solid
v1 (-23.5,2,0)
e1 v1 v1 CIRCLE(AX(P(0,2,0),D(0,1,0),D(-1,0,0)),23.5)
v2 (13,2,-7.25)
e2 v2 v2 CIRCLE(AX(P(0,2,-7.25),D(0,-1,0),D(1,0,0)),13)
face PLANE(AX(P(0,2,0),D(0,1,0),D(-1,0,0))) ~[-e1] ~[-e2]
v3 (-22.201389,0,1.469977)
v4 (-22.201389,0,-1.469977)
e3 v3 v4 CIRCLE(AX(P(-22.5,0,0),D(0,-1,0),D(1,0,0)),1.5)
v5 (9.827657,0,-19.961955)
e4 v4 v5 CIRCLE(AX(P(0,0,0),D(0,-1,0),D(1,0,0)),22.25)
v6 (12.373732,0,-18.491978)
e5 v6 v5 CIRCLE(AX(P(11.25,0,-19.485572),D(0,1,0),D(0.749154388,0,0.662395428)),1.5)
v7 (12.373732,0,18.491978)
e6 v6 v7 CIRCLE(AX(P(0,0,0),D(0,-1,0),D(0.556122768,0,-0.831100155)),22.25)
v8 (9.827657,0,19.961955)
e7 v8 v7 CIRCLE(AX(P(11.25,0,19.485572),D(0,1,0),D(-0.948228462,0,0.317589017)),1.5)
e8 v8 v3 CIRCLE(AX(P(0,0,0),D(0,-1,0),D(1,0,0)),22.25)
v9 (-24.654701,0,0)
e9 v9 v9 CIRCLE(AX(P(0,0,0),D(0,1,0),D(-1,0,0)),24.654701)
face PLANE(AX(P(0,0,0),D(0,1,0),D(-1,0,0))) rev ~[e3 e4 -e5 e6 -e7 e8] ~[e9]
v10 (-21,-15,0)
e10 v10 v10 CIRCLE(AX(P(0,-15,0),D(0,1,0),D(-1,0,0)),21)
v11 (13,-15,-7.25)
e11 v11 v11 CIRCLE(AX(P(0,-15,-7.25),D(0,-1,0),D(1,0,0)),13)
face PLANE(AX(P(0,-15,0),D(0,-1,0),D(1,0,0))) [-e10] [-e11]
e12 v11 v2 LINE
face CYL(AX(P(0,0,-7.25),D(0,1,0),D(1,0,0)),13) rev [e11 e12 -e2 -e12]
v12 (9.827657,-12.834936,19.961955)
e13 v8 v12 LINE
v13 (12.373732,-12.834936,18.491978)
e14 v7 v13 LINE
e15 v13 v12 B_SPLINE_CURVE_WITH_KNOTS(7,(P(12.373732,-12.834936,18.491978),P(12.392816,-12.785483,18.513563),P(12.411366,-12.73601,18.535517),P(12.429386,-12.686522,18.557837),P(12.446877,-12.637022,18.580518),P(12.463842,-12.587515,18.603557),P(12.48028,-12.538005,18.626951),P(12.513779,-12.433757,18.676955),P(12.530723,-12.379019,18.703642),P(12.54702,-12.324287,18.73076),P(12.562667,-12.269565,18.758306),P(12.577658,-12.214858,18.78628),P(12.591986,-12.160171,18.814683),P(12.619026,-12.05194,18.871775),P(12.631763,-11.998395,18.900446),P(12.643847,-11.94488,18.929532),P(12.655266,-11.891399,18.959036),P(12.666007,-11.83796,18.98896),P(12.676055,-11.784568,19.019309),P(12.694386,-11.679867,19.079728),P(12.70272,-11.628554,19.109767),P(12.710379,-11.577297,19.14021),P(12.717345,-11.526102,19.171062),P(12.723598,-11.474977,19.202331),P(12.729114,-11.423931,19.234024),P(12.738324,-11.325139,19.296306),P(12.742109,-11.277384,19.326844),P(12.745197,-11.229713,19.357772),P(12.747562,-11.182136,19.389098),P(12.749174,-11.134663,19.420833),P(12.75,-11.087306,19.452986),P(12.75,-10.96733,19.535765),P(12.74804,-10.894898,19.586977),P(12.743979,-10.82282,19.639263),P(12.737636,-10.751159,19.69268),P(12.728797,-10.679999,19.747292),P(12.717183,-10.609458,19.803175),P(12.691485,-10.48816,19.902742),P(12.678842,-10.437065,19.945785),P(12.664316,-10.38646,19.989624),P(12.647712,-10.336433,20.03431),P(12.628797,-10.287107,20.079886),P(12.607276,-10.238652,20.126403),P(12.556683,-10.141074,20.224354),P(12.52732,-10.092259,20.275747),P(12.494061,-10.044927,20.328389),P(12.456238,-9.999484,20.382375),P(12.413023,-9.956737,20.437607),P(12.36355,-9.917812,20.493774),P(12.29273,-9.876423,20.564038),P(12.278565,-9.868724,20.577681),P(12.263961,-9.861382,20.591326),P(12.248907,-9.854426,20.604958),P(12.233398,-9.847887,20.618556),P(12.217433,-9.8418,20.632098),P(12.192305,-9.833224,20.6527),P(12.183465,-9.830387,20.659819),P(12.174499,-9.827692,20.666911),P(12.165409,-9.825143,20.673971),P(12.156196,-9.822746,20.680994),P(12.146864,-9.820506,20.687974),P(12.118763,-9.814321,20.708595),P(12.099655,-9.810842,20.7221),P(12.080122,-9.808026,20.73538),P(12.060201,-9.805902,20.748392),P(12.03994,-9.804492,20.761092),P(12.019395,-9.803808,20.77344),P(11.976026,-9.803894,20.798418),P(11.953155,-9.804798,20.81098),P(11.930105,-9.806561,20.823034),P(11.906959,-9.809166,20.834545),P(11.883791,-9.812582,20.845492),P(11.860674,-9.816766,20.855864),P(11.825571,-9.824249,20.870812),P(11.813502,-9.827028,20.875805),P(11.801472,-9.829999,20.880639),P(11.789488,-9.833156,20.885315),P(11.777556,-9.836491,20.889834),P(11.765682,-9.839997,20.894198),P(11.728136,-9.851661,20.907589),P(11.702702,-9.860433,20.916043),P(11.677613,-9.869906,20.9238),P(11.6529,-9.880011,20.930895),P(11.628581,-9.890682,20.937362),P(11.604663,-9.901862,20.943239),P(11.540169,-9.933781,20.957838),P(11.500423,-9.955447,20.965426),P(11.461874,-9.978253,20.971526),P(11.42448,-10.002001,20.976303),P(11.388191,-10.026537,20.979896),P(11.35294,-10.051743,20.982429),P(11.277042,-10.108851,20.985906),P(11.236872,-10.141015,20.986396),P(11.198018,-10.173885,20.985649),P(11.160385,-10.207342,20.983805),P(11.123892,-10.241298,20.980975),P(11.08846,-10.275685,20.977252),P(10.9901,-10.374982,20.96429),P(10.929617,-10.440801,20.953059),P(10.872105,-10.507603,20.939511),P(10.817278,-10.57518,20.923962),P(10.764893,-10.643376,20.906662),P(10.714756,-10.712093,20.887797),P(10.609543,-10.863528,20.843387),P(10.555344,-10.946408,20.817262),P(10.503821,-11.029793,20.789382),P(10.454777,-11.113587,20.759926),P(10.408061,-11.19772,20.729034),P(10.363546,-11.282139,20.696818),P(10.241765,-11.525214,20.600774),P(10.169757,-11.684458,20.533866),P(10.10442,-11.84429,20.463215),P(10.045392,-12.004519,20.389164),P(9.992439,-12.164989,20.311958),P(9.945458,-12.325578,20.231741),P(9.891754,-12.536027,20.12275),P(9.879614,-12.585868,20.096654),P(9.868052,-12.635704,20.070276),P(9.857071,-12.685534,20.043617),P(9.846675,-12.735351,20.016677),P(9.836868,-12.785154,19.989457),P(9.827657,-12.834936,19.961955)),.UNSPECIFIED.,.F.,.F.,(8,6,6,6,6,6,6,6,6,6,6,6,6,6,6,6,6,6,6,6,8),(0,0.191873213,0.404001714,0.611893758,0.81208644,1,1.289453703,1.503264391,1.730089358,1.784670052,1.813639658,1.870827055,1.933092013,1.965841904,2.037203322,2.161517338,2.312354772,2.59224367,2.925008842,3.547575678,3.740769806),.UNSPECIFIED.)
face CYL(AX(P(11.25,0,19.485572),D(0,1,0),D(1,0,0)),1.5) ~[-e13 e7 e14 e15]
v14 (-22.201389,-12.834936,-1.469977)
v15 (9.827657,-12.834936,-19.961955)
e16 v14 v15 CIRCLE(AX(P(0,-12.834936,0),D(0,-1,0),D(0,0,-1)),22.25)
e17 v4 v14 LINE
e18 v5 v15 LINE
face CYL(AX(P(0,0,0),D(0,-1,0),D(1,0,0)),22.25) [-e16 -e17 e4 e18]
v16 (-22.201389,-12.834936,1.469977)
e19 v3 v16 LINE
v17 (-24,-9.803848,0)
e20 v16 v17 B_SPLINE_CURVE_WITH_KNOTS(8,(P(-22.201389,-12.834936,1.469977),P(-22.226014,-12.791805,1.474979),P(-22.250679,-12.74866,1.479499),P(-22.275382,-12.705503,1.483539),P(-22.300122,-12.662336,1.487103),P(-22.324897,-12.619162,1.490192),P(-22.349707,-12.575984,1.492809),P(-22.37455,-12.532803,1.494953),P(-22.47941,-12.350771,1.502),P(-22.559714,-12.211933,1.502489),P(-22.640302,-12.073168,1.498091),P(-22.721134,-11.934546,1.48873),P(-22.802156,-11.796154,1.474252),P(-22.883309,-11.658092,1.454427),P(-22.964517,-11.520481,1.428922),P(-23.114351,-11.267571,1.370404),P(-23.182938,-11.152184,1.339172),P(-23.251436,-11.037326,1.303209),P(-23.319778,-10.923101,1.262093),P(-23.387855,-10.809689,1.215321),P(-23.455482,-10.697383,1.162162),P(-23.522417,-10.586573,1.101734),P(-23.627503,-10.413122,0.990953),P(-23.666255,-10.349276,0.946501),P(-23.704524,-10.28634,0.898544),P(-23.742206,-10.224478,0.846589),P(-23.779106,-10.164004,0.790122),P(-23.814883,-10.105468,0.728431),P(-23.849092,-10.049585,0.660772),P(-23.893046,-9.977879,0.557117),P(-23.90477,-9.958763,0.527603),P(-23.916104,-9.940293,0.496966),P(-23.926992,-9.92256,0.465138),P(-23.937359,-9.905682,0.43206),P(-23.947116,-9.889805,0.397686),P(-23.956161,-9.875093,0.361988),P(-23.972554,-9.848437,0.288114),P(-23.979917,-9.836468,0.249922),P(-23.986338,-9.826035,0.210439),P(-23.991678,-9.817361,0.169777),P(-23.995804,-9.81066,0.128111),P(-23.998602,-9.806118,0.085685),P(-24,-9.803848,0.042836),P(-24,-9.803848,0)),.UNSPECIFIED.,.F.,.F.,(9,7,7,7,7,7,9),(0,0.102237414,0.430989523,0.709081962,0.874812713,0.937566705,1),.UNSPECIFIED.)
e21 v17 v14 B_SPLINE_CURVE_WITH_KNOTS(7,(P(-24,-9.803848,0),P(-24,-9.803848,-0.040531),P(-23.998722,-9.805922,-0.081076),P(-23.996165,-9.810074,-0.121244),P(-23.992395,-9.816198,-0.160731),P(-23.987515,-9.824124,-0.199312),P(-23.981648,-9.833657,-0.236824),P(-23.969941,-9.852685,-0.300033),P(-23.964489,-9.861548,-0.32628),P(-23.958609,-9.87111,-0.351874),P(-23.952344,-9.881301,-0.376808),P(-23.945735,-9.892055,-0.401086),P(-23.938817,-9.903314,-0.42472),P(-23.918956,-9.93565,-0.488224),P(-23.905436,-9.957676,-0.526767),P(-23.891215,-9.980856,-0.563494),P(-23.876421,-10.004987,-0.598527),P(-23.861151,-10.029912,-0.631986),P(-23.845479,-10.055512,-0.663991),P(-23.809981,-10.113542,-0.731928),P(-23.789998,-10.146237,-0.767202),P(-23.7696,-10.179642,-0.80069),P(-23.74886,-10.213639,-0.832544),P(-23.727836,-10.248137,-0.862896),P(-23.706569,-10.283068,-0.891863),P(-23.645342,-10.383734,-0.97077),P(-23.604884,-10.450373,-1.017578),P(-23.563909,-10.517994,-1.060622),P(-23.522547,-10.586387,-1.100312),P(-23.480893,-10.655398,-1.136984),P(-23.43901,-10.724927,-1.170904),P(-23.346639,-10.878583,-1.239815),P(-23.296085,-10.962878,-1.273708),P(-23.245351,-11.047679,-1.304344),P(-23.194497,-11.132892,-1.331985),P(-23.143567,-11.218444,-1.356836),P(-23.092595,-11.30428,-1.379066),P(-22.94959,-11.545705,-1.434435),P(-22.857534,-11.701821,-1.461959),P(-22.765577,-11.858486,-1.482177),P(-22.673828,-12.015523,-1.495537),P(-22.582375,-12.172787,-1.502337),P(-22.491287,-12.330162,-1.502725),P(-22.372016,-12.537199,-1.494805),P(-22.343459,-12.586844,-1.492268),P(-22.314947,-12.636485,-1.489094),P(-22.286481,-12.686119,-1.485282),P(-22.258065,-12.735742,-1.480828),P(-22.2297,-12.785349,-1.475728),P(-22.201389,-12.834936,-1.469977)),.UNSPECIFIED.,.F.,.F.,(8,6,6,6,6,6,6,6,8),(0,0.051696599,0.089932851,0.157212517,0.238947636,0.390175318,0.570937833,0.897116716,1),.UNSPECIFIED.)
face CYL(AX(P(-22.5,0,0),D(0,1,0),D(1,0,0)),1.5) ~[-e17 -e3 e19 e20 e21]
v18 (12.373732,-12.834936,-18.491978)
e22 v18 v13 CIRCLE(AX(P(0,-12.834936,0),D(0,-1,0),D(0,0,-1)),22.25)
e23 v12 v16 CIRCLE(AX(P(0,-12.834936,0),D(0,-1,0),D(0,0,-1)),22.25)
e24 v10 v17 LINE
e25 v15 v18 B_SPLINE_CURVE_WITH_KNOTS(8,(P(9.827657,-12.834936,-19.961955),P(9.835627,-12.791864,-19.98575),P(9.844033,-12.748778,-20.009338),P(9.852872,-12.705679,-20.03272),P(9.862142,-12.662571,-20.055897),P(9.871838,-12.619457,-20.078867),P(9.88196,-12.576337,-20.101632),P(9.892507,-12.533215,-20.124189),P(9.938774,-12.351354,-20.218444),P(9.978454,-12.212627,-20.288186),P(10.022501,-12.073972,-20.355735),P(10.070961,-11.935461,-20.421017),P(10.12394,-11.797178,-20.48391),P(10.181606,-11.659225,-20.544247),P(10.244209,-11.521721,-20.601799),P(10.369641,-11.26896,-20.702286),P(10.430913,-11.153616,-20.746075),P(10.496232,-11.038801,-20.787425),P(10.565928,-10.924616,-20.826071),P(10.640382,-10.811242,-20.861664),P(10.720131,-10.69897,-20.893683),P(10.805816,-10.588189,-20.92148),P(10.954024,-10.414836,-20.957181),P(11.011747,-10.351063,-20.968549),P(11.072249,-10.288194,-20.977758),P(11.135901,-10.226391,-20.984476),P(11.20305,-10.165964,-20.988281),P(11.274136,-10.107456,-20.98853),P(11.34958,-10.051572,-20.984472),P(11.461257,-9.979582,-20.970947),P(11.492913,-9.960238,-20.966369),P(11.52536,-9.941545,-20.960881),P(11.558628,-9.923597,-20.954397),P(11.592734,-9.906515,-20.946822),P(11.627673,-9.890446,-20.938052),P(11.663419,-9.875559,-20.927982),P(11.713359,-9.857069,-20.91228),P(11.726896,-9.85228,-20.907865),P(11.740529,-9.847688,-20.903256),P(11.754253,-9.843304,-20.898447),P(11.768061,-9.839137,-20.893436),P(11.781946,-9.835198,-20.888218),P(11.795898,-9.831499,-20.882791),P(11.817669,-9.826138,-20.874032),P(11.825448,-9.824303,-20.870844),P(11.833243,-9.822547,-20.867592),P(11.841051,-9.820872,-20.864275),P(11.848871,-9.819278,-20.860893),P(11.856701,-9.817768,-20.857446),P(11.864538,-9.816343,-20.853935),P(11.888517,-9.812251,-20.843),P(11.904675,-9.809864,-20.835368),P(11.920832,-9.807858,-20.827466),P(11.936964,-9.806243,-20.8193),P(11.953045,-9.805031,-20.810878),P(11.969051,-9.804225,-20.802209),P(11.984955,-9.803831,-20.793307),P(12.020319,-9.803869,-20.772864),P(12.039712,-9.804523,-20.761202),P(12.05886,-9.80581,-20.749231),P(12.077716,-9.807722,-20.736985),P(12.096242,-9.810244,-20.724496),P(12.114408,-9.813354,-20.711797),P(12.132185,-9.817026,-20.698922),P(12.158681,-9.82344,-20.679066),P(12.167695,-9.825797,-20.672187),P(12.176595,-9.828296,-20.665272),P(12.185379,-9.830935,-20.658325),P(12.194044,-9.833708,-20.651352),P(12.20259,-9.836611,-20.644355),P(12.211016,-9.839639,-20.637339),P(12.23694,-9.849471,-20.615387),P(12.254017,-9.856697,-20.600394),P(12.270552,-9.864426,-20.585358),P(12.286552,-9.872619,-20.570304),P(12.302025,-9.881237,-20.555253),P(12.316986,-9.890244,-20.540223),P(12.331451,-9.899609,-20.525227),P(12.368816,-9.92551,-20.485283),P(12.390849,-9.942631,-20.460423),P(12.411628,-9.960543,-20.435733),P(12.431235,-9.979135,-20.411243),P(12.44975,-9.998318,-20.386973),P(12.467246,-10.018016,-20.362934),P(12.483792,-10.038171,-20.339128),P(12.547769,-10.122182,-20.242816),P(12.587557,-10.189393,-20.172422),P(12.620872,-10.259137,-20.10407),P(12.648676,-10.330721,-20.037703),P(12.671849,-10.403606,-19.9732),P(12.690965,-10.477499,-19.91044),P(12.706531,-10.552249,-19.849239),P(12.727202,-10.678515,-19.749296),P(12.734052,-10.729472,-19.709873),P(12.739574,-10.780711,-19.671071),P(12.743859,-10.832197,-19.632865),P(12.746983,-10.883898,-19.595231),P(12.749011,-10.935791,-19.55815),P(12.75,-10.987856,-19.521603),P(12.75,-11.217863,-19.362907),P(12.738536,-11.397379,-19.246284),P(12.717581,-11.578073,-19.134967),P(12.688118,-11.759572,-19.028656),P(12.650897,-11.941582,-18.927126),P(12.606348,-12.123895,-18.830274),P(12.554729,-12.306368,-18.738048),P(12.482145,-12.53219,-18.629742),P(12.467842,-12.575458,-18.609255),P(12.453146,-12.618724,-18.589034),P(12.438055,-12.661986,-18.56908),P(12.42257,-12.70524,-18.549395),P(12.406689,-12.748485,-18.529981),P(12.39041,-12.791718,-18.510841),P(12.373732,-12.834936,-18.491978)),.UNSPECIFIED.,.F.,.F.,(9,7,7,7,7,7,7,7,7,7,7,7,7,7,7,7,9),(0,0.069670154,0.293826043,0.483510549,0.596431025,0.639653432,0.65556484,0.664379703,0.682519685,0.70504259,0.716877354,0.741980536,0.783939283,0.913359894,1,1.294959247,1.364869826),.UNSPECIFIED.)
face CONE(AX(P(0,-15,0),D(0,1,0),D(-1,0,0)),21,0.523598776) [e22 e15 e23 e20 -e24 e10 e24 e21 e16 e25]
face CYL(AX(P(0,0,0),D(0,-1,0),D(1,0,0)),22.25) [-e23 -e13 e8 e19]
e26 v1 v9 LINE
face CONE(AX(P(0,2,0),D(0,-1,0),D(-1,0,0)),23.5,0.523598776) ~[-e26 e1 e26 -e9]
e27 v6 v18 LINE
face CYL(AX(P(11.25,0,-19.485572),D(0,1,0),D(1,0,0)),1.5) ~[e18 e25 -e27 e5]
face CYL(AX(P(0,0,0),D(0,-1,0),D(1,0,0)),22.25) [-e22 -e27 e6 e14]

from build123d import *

# Parameters (mm, degrees)
F0_R          = 22.25
F0_R_2        = 13
F1_DEPTH      = 15
F1_DEPTH_BACK = 2
F4_R          = 1.5
F5_DEPTH      = 15


with BuildPart() as f1:
    # F0 (on Front) → F1 (new body, two sides)
    with BuildSketch(Plane.XZ) as f1_sk:
        Circle(F0_R)
        with Locations((0, -7.25)):
            Circle(F0_R_2, mode=Mode.SUBTRACT)
    extrude(amount=F1_DEPTH)
    extrude(f1_sk.sketch, amount=-F1_DEPTH_BACK)

    # F2 (on Top) → F3 (revolve)
    with BuildSketch(Plane.XY):
        Polygon((-24.6547005384, 0), (-21.5, 0), (-21.5, 2), (-23.5, 2), align=None)
    revolve(axis=Axis((0, 0, 0), (0, 1, 0)))

    # F4 (on Front) → F5 (join, through all)
    with BuildSketch(Plane.XZ):
        with Locations((-22.5, 0)):
            Circle(F4_R)
        with Locations((11.25, -19.4855715851)):
            Circle(F4_R)
        with Locations((11.25, 19.4855715851)):
            Circle(F4_R)
    extrude(amount=F5_DEPTH)

    # F6 (on Top) → F7 (revolve, cut)
    with BuildSketch(Plane.XY):
        Polygon((-24.8129580218, -15), (-21, -15), (-24.8129580218, -8.3957629791), align=None)
    revolve(axis=Axis((0, 0, 0), (0, 1, 0)), mode=Mode.SUBTRACT)


solid = f1.part
